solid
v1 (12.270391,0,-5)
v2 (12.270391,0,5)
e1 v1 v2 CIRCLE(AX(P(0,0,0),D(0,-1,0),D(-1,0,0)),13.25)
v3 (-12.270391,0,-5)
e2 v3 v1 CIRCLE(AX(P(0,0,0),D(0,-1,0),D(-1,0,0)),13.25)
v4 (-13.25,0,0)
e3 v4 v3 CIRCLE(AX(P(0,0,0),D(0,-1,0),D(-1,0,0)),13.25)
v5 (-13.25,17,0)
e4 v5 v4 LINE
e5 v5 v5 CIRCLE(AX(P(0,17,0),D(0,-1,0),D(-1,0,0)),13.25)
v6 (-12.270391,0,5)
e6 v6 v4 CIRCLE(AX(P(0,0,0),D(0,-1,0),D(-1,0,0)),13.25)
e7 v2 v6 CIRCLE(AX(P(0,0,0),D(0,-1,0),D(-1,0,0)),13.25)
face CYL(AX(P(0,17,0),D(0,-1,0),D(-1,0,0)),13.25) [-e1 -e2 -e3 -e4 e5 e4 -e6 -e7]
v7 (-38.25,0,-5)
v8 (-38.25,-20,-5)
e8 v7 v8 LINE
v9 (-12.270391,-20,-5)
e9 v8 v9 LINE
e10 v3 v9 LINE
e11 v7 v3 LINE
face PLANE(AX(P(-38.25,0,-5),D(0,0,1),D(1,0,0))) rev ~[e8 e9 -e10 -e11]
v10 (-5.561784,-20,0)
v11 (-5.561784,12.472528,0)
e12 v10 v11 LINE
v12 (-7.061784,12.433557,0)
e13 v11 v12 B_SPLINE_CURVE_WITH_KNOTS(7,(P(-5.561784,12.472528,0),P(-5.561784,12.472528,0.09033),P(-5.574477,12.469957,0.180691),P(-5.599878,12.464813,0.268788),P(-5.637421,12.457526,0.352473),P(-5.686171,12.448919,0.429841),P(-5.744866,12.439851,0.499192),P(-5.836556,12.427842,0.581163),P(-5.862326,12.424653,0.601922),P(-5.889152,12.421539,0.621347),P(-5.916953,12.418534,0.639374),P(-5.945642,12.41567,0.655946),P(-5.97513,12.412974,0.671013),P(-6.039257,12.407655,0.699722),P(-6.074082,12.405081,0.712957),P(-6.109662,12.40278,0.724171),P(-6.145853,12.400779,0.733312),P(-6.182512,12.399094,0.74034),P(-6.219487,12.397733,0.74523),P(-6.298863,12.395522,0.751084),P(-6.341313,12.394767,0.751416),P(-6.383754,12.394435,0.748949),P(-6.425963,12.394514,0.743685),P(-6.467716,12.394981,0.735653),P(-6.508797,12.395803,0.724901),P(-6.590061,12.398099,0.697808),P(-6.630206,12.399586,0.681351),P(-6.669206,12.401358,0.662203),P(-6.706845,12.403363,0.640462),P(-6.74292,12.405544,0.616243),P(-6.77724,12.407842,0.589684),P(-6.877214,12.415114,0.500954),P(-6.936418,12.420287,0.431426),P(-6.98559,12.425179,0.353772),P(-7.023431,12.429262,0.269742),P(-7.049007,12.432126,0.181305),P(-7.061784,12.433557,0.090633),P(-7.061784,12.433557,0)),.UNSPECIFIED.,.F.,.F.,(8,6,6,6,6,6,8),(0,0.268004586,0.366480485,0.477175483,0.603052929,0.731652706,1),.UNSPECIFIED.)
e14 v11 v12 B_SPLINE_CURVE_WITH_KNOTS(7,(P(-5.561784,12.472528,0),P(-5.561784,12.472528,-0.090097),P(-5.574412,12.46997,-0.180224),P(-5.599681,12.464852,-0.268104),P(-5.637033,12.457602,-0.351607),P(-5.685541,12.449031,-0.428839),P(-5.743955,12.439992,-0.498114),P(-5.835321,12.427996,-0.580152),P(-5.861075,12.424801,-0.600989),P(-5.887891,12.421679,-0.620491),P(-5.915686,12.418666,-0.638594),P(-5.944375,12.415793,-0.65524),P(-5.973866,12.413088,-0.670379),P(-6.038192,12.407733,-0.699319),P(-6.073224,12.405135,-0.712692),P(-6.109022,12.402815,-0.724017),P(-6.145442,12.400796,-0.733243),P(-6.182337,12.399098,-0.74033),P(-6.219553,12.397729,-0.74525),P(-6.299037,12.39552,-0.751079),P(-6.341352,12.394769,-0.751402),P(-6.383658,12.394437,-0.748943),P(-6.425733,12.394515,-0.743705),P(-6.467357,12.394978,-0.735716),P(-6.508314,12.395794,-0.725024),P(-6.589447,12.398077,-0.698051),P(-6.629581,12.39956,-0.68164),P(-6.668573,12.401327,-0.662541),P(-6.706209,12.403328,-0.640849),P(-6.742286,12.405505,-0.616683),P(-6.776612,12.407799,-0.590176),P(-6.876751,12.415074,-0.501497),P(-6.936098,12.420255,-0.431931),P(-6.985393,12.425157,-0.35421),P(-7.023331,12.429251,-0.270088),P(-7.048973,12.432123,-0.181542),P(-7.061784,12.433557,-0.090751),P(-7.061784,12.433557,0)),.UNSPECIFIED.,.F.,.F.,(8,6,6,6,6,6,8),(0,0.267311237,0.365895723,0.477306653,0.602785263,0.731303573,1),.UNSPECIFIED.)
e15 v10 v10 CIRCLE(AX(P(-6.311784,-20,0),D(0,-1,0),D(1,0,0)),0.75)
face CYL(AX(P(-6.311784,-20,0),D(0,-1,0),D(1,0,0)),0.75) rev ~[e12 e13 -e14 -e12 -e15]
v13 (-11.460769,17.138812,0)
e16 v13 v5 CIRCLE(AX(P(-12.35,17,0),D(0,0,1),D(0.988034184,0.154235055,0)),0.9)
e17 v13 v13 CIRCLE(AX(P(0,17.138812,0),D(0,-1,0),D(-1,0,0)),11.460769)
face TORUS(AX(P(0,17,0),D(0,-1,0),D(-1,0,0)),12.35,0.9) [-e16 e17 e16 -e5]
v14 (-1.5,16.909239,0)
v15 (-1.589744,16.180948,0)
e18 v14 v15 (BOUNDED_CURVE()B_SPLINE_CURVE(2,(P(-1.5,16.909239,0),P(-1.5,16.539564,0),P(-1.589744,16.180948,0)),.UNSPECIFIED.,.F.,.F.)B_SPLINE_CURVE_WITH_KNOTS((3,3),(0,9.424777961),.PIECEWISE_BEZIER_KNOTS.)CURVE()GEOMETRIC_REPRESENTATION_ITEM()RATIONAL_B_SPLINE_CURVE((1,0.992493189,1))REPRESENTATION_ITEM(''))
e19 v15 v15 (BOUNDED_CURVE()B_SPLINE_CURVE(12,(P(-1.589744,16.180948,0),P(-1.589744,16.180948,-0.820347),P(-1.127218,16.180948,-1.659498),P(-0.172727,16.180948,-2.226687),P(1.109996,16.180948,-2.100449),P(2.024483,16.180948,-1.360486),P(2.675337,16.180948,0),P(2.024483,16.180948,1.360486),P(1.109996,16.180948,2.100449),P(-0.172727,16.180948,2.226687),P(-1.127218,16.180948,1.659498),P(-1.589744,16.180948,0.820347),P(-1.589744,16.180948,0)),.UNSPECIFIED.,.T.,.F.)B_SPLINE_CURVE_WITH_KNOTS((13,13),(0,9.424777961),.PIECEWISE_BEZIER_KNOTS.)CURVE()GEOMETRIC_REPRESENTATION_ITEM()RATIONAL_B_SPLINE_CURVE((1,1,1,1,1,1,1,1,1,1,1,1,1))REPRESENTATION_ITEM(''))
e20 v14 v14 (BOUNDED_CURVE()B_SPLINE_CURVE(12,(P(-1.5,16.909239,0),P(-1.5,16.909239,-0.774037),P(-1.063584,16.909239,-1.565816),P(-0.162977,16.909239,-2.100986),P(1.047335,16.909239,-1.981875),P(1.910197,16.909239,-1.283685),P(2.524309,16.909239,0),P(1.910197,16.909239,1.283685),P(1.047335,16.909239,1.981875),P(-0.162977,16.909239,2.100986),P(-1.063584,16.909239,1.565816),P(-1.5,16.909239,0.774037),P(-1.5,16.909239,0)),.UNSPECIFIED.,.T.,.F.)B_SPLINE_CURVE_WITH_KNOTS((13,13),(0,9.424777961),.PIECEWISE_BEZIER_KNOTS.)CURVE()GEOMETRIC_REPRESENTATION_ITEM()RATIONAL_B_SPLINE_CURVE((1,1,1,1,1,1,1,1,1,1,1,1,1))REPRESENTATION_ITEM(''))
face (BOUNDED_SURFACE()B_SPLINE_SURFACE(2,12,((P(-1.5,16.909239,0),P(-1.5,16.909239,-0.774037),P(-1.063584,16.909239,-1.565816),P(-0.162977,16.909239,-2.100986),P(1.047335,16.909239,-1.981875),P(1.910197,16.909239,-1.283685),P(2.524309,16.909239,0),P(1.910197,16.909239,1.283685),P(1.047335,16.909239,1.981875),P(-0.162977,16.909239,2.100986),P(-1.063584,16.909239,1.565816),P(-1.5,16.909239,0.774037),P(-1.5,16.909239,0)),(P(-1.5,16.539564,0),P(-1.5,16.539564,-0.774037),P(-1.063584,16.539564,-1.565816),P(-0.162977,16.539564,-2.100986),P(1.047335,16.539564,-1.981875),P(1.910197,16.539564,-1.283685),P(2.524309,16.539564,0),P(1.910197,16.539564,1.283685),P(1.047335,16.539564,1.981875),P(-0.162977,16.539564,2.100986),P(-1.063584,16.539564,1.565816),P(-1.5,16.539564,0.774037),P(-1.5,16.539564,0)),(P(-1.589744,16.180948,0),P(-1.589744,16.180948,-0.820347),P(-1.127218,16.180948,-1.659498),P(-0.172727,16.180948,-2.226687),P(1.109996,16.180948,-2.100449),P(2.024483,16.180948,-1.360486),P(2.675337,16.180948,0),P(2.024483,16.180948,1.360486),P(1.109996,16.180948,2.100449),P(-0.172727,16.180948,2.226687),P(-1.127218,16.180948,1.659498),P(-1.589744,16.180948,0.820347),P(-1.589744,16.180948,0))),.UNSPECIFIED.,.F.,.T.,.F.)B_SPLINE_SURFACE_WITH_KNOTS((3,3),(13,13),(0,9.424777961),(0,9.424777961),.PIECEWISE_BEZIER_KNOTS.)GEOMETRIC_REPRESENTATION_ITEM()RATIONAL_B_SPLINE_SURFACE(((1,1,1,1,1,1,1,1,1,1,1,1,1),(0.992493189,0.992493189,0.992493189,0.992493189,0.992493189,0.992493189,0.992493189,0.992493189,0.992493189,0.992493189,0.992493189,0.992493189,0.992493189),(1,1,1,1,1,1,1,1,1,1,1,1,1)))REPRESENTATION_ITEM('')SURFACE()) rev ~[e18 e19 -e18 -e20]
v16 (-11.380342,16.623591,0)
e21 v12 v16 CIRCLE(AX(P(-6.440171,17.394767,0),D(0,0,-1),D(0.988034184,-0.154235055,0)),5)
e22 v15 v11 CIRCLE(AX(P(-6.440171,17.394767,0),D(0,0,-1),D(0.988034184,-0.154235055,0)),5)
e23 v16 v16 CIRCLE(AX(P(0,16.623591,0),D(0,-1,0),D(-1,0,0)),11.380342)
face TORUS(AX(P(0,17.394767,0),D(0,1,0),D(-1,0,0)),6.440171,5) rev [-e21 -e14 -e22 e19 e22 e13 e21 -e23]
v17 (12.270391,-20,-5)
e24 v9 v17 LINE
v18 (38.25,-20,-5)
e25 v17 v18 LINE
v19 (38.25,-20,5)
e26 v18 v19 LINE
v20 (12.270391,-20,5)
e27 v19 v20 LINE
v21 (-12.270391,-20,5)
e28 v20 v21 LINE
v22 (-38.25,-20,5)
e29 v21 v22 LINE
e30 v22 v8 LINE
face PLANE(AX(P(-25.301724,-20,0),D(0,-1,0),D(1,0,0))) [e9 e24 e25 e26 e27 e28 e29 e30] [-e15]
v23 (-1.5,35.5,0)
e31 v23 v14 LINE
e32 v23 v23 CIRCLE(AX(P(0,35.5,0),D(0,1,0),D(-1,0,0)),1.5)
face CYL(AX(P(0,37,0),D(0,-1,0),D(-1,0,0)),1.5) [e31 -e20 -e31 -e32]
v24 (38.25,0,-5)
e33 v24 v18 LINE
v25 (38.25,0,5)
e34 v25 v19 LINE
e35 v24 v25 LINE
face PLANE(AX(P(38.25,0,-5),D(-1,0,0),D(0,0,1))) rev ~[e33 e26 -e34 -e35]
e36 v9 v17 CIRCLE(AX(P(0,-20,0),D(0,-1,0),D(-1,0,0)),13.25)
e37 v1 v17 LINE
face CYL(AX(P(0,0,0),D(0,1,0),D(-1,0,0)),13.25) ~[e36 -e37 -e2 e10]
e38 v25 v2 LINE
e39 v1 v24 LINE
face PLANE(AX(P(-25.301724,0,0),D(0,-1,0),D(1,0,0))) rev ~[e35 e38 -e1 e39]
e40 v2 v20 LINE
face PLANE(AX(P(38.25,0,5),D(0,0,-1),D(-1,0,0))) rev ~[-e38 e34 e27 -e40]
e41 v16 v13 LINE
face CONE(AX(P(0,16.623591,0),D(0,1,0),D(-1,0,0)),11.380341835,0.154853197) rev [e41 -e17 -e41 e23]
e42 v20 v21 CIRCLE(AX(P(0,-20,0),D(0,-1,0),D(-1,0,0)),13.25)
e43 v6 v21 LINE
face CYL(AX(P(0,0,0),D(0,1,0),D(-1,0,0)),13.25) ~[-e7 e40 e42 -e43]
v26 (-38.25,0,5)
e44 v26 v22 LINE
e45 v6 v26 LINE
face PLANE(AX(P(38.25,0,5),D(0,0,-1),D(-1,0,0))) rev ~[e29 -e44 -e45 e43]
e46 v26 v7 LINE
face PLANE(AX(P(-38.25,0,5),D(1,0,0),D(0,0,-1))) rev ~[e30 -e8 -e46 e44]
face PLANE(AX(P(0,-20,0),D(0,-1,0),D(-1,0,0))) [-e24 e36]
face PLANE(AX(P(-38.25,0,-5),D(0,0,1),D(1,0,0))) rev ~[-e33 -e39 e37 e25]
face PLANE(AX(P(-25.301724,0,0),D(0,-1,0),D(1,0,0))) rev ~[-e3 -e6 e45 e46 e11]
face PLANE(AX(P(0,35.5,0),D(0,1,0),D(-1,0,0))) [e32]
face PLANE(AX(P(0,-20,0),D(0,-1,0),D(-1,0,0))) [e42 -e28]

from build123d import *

# Parameters (mm, degrees)
F2_R     = 3
F4_DEPTH = 20
F5_DEPTH = 20
F6_R     = 1.5
F7_DEPTH = 1.5
F8_R     = 0.75
F9_DEPTH = 55.5010001


with BuildPart() as f1:
    # F0 (on Top) → F1 (revolve)
    with BuildSketch(Plane.XY):
        with BuildLine():
            Line((-13.25, 0), (0, 0))
            Line((0, 0), (0, 37))
            Line((0, 37), (-1.5, 37))
            Line((-1.5, 37), (-1.5, 16.6235913226))
            ThreePointArc((-1.5, 16.6235913226), (-6.4401709177, 12.3947665973), (-11.3803418353, 16.6235913226))
            Line((-11.3803418353, 16.6235913226), (-11.4607692348, 17.1388115494))
            ThreePointArc((-11.4607692348, 17.1388115494), (-12.4196143352, 17.8973036522), (-13.25, 17))
            Line((-13.25, 17), (-13.25, 0))
        make_face()
    revolve(axis=Axis((0, 18.5, 0), (0, -1, 0)))

    # F2
    f2_edges = [f1.edges().sort_by_distance(p)[0] for p in [
        (1.5, 16.623591, 0),
    ]]
    fillet(f2_edges, radius=F2_R)

    # F3 (on face) → F4 (join)
    with BuildSketch(Plane.XZ):
        with BuildLine():
            Line((-12.2703911918, 5), (-38.25, 5))
            Line((-38.25, 5), (-38.25, -5))
            Line((-38.25, -5), (-12.2703911918, -5))
            ThreePointArc((-12.2703911918, -5), (-13.25, 0), (-12.2703911918, 5))
        make_face()
        with BuildLine():
            Line((12.2703911918, 5), (-12.2703911918, 5))
            ThreePointArc((-12.2703911918, 5), (-13.25, 0), (-12.2703911918, -5))
            Line((-12.2703911918, -5), (12.2703911918, -5))
            ThreePointArc((12.2703911918, -5), (13.0027916866, -2.5475298535), (13.25, 0))
            ThreePointArc((13.25, 0), (13.0027916866, 2.5475298535), (12.2703911918, 5))
        make_face()
        with BuildLine():
            Line((38.25, 5), (12.2703911918, 5))
            ThreePointArc((12.2703911918, 5), (13.0027916866, 2.5475298535), (13.25, 0))
            ThreePointArc((13.25, 0), (13.0027916866, -2.5475298535), (12.2703911918, -5))
            Line((12.2703911918, -5), (38.25, -5))
            Line((38.25, -5), (38.25, 5))
        make_face()
    extrude(amount=F4_DEPTH)

    # F5 (add): faces of the model
    f5_faces = [f1.faces().sort_by_distance(p)[0] for p in [
        (0, 0, 8.4077666552),
        (0, 0, -8.4077666552),
    ]]
    extrude(f5_faces, amount=F5_DEPTH)

    # F6 (on face) → F7 (cut)
    with BuildSketch(Plane(origin=(0, 37, 0), x_dir=(-1, 0, 0), z_dir=(0, 1, 0))):
        Circle(F6_R)
    extrude(amount=-F7_DEPTH, mode=Mode.SUBTRACT)

    # F8 (on face) → F9 (cut, through all)
    with BuildSketch(Plane.XZ.offset(20)):
        with Locations((-6.3117844984, 0)):
            Circle(F8_R)
    extrude(amount=-F9_DEPTH, mode=Mode.SUBTRACT)


solid = f1.part
